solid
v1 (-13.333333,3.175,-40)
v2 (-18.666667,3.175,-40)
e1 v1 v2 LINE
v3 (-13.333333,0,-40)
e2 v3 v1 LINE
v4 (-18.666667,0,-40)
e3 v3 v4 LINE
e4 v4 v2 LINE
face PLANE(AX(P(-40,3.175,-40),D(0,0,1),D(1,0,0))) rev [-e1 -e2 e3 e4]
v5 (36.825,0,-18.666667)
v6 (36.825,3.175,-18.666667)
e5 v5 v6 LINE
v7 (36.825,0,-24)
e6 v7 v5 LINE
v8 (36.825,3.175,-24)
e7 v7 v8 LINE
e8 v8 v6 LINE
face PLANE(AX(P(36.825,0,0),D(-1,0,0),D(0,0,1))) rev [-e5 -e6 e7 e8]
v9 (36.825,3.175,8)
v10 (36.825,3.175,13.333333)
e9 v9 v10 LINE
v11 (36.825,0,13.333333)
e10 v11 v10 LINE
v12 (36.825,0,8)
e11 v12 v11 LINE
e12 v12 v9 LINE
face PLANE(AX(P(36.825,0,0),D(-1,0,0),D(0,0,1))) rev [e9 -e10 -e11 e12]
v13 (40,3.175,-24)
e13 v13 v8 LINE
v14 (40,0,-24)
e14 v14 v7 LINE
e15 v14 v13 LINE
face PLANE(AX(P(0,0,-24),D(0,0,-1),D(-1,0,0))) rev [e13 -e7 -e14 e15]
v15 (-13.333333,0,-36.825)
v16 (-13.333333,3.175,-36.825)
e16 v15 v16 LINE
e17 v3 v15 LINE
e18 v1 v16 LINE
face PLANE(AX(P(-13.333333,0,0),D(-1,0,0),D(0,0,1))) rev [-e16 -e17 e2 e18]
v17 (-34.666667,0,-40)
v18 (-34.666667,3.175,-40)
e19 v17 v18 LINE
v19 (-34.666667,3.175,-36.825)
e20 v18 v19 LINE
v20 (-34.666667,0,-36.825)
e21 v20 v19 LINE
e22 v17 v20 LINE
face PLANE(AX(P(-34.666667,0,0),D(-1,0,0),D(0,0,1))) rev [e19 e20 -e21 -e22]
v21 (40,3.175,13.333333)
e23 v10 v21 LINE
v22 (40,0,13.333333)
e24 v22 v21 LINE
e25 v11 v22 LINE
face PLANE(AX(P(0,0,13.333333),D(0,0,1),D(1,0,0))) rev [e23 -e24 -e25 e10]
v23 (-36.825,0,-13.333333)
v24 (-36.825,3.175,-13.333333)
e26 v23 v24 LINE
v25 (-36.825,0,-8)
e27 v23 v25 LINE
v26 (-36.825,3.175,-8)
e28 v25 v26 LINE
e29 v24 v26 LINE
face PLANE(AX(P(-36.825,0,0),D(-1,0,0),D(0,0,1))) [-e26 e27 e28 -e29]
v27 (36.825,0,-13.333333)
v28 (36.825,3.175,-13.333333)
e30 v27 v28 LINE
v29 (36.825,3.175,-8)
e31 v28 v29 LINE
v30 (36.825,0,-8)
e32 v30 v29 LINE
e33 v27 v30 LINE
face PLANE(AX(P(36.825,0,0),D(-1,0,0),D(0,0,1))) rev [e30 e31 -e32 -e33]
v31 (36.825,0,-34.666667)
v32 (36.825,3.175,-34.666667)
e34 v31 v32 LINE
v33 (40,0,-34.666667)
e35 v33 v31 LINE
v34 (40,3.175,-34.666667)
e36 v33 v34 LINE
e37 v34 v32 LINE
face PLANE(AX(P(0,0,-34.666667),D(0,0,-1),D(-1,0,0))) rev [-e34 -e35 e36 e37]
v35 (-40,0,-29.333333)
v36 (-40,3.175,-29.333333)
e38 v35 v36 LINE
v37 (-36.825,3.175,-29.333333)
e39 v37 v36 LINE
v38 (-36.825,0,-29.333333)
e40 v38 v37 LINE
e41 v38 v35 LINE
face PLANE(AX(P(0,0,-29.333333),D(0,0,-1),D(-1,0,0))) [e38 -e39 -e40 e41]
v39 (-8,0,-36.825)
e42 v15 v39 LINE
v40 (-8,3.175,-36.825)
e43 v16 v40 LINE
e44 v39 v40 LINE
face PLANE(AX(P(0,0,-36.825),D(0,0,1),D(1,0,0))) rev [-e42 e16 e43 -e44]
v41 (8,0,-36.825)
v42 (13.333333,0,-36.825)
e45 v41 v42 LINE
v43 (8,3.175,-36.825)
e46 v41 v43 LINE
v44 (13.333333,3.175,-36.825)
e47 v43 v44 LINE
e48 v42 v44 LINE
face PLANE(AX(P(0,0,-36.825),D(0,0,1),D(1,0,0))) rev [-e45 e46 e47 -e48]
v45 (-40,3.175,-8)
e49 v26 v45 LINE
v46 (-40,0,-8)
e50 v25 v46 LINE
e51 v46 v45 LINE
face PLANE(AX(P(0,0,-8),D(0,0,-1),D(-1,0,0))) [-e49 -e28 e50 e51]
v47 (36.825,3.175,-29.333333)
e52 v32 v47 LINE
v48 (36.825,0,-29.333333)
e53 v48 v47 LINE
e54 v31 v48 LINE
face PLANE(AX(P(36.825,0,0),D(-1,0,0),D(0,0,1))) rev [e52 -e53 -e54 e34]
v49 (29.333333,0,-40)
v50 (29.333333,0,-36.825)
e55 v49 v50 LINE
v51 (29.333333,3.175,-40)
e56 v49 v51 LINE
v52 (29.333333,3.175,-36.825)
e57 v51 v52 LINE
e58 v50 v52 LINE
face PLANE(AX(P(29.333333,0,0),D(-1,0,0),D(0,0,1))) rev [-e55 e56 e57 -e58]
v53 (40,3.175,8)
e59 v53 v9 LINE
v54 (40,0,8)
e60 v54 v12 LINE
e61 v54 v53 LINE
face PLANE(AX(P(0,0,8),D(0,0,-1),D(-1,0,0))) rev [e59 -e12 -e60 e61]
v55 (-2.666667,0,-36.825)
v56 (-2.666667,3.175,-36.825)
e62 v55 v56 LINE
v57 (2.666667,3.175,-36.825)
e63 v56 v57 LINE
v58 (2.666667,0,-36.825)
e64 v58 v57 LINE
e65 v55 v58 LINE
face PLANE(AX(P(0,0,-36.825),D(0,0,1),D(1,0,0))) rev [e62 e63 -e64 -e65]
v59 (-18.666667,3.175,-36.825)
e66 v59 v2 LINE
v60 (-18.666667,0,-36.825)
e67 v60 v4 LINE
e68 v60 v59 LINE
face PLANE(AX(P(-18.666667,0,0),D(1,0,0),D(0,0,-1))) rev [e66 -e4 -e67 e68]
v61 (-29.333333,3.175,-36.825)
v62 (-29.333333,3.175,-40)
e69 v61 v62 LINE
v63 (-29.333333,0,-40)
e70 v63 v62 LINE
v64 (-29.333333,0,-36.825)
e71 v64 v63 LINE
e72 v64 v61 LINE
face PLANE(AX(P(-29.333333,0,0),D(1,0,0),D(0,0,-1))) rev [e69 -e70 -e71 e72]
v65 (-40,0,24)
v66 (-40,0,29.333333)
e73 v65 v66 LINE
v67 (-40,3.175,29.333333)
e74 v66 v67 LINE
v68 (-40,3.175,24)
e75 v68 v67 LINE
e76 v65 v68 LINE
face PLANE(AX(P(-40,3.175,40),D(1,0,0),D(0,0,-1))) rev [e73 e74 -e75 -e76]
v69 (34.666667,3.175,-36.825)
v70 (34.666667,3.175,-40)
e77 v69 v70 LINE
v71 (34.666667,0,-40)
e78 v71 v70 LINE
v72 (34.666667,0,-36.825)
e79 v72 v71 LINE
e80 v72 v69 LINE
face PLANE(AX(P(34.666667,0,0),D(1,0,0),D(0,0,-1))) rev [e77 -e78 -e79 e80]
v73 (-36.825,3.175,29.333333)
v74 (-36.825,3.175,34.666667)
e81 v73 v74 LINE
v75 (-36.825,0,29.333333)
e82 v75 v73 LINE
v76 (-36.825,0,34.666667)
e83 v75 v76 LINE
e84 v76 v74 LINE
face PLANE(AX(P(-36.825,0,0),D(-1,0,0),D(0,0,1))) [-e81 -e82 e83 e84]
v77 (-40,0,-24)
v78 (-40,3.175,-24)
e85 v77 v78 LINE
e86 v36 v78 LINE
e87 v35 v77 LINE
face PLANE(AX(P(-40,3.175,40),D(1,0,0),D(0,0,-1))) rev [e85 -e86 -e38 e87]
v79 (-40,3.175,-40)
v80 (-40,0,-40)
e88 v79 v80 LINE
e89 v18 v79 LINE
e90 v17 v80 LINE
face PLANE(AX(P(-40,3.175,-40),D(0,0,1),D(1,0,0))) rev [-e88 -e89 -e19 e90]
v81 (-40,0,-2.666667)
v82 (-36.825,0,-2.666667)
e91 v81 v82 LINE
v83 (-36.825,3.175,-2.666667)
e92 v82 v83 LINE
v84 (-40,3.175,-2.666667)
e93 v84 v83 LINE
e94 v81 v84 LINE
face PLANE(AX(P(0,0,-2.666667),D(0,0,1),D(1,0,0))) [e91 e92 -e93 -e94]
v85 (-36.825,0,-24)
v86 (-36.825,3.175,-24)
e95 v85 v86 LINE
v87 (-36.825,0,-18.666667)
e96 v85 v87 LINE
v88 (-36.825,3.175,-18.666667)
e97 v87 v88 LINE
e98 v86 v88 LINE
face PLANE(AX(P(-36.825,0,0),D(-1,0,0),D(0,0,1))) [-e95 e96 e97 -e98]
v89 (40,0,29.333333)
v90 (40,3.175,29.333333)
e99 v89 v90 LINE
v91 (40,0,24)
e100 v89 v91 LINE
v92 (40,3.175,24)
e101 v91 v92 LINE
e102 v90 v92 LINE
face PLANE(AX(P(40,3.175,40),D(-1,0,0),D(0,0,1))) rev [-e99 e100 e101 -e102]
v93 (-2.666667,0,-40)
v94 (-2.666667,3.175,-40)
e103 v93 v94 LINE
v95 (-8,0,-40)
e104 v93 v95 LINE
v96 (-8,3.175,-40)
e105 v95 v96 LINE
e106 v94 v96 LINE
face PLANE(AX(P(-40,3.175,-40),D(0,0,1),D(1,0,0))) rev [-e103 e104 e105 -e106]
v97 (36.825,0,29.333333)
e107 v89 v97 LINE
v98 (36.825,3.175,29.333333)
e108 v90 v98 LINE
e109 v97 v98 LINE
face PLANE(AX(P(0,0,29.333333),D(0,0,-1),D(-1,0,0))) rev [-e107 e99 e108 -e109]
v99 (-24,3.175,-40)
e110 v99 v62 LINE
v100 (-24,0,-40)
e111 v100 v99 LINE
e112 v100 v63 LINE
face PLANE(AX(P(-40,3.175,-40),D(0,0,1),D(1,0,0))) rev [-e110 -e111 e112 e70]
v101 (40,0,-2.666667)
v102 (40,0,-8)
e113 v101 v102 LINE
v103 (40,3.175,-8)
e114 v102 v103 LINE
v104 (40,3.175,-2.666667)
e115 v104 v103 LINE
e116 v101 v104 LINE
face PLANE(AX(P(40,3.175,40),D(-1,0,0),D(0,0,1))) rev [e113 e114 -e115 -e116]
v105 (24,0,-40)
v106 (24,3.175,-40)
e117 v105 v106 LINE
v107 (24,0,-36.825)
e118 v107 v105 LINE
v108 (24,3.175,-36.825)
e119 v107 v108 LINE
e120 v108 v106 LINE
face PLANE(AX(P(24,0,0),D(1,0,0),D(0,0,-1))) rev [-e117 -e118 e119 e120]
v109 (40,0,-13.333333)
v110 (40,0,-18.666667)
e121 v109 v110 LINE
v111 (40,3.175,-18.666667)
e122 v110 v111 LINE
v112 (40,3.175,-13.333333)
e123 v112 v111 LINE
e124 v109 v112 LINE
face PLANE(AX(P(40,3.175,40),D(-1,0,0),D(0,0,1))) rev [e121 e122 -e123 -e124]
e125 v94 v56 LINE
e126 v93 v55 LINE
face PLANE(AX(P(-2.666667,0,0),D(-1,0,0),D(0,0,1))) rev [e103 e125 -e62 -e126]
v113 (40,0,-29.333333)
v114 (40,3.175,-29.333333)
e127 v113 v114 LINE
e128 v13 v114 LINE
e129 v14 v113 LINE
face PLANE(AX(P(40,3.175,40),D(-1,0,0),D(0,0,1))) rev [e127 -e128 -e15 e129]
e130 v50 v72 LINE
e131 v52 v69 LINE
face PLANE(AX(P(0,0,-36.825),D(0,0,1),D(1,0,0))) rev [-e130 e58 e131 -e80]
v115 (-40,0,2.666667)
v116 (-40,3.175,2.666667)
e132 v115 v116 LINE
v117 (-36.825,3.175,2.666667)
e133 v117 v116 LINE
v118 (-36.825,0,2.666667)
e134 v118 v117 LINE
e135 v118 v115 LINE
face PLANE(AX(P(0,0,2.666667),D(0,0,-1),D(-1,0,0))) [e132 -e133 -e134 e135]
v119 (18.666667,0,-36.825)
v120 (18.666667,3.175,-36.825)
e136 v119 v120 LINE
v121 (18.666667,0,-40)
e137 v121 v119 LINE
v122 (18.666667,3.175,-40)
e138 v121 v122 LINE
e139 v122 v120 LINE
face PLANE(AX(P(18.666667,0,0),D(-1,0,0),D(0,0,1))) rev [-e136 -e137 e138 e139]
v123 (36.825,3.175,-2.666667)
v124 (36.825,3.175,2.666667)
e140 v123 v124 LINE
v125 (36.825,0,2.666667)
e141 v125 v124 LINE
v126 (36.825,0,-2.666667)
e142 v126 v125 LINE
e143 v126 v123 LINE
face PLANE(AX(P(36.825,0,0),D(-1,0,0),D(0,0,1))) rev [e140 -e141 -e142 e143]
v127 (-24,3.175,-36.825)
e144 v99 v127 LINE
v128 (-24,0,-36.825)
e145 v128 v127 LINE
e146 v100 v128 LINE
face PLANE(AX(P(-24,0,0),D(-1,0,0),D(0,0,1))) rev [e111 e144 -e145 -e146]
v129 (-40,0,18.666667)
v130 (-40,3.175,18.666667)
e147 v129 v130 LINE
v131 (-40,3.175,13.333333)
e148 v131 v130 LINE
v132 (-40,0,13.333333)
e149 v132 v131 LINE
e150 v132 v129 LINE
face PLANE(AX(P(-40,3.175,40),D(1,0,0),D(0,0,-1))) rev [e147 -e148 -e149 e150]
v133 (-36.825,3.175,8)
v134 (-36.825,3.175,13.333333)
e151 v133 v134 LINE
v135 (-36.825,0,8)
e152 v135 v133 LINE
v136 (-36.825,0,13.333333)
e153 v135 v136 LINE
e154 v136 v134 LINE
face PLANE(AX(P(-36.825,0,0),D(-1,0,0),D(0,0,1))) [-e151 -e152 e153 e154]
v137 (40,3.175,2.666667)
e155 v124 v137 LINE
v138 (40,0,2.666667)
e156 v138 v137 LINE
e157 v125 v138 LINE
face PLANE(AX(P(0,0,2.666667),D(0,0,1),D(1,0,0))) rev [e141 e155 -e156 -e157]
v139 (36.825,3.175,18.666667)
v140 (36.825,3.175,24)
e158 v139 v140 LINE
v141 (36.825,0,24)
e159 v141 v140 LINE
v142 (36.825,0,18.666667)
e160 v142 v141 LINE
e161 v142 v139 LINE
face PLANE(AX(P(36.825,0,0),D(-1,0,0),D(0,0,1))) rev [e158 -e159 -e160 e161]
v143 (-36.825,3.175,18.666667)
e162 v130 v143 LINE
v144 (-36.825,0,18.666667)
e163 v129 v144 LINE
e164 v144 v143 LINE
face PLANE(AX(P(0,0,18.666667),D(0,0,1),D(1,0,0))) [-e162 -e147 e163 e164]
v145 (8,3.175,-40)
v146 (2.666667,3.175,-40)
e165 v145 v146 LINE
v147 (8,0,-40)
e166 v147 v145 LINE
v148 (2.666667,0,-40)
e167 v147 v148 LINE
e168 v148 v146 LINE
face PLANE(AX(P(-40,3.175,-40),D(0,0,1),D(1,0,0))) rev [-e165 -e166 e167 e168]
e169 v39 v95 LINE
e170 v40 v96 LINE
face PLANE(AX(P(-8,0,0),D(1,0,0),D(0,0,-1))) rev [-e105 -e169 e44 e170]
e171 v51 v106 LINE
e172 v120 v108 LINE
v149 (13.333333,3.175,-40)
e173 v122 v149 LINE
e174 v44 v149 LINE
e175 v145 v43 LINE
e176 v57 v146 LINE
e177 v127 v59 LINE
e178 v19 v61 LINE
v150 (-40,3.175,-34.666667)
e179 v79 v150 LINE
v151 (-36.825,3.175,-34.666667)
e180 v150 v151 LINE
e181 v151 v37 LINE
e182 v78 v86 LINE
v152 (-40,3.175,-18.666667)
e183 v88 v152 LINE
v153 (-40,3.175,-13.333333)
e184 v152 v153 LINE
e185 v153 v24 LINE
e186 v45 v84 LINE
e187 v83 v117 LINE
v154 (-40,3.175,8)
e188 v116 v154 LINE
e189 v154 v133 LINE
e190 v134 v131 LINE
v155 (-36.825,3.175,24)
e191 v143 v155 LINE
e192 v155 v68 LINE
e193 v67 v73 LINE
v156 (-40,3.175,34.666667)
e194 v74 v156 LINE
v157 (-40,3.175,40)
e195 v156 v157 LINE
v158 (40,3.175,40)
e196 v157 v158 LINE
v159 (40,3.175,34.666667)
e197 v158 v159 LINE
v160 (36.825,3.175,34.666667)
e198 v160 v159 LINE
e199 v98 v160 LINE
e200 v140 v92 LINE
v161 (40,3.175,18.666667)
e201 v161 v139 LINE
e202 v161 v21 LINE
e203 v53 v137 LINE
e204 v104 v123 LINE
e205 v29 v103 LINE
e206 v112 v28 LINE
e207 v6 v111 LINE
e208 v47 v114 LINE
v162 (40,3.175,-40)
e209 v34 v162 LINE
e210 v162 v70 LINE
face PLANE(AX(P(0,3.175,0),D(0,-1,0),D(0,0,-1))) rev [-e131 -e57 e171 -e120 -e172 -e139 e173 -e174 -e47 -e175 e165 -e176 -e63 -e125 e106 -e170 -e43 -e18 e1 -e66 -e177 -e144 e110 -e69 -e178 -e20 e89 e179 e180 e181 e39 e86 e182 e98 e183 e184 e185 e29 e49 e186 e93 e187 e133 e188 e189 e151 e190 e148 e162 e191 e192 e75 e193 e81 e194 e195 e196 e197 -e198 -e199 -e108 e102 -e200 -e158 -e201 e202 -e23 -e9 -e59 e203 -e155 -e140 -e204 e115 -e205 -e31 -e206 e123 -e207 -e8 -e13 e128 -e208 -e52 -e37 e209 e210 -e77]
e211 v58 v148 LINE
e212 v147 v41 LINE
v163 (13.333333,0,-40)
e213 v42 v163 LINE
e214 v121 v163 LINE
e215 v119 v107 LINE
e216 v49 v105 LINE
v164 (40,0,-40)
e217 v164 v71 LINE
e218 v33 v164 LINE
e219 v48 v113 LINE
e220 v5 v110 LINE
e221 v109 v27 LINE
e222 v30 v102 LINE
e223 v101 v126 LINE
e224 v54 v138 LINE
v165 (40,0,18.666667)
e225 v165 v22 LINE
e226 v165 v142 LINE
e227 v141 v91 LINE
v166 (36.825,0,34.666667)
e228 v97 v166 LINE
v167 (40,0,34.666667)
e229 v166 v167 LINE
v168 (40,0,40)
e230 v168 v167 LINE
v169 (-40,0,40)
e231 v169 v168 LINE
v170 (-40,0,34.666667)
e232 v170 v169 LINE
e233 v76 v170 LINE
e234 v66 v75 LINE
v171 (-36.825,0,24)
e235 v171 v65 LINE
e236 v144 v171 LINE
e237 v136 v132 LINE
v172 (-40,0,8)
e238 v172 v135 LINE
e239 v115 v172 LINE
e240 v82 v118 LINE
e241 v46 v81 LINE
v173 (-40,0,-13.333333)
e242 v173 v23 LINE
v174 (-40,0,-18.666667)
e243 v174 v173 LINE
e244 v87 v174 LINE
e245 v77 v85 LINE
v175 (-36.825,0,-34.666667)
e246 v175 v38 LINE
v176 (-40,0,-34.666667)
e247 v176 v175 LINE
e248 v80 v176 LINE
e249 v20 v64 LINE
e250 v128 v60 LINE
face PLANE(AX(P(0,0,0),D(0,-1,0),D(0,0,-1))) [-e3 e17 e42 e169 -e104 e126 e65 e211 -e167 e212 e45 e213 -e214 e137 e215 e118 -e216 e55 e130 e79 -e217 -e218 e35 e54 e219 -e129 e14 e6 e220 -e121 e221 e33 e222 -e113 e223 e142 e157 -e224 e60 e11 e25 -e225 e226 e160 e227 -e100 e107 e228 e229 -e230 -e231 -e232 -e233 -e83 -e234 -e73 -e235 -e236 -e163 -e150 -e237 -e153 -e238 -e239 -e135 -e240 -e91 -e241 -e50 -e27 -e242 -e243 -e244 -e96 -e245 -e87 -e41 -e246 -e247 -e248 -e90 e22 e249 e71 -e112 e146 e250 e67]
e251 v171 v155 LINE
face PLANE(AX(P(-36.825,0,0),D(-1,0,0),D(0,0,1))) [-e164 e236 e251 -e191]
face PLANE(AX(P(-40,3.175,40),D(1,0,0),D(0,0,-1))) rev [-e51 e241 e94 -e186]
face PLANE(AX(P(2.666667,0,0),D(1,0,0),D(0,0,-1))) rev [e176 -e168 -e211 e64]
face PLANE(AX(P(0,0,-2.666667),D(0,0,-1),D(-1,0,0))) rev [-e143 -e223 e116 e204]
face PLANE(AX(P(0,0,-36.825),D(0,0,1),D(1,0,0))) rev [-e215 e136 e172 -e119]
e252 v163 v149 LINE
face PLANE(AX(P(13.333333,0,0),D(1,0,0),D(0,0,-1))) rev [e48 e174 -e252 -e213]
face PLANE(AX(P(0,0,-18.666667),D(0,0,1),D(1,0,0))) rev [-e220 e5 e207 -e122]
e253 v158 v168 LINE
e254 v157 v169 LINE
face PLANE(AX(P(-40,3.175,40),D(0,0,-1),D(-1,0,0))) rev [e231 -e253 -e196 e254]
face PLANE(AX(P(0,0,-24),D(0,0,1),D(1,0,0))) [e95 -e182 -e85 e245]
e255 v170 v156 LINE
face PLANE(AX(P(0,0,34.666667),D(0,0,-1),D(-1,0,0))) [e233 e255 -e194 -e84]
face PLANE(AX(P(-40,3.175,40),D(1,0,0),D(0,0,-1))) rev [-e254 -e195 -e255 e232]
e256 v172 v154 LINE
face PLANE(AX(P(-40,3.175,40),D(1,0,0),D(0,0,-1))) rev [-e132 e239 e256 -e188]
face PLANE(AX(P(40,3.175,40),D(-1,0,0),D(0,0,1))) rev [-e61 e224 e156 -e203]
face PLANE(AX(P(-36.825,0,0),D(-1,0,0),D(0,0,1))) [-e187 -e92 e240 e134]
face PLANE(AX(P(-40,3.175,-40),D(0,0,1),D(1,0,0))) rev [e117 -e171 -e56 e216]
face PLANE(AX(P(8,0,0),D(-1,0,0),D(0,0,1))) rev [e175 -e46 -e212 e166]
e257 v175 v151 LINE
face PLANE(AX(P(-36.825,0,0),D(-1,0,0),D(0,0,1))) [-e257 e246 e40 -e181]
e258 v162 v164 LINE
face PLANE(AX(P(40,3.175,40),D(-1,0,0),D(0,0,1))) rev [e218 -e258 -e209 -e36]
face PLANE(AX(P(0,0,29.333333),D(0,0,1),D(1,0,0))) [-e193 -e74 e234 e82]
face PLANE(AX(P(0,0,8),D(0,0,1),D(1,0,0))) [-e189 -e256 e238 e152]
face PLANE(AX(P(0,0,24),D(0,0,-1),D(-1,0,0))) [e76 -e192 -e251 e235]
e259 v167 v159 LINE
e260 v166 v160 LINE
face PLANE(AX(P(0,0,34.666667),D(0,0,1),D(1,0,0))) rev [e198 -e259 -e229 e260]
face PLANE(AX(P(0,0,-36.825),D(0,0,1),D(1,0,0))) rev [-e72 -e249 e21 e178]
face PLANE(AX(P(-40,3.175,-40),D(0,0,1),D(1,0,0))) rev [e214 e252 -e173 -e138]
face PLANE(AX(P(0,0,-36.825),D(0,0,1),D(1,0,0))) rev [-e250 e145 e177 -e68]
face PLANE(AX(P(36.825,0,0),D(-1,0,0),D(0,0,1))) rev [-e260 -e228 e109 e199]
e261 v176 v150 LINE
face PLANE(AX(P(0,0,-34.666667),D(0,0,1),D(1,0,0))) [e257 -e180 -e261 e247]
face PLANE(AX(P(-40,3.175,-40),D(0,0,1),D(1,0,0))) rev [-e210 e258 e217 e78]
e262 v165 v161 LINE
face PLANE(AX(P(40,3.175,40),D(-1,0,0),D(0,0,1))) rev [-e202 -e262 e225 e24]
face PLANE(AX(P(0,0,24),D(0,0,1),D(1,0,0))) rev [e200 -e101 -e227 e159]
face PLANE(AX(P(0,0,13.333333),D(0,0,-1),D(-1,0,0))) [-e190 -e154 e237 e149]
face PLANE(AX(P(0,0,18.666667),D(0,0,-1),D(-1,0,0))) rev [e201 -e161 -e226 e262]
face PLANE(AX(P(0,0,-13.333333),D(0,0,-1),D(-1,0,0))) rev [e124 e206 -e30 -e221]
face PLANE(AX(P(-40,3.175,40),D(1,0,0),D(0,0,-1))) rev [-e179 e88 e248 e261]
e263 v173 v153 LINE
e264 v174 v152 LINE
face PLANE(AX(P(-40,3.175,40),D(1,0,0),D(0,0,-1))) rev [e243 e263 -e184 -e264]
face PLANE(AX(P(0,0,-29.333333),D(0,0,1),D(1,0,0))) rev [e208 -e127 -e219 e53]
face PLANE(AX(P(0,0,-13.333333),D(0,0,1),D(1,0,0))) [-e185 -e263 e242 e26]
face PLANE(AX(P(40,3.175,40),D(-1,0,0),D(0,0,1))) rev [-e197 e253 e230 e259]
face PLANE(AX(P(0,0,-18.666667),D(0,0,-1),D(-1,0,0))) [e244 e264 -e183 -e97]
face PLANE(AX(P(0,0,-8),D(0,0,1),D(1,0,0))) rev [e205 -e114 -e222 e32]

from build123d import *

# Parameters (mm, degrees)
SKETCH1_W                = 80
SKETCH1_H                = 80
BOSS_EXTRUDE1_DEPTH      = 3.175
CUT_EXTRUDE3_START       = -3.175
CUT_EXTRUDE3_OUTLINE_W   = 3.175
CUT_EXTRUDE3_OUTLINE_H   = 5.333333334
CUT_EXTRUDE3_OUTLINE_H_2 = 5.333333333
CUT_EXTRUDE3_OUTLINE_W_2 = 5.333333334
CUT_EXTRUDE3_OUTLINE_H_3 = 3.175
CUT_EXTRUDE3_OUTLINE_W_3 = 5.333333333
CUT_EXTRUDE3_DEPTH       = 3.175
SKETCH3_W                = 80
SKETCH3_H                = 5.333333333
BOSS_EXTRUDE2_DEPTH      = 3.175


# Read off the part's stored shape, not the designer's step: Cut-Extrude3
with BuildPart() as part:
    # Sketch1 → Boss-Extrude1 (new body)
    with BuildSketch(Plane(origin=(0, 0, 0), x_dir=(1, 0, 0), z_dir=(0, 1, 0))):
        Rectangle(SKETCH1_W, SKETCH1_H)
    extrude(amount=BOSS_EXTRUDE1_DEPTH)

    # Cut-Extrude3 outline → Cut-Extrude3 (cut)
    with BuildSketch(Plane(origin=(0, 3.175, 0), x_dir=(1, 0, 0), z_dir=(0, 1, 0)).offset(CUT_EXTRUDE3_START)):
        with Locations((-38.4125, 32)):
            Rectangle(CUT_EXTRUDE3_OUTLINE_W, CUT_EXTRUDE3_OUTLINE_H)
        with Locations((-38.4125, 21.333333334)):
            Rectangle(CUT_EXTRUDE3_OUTLINE_W, CUT_EXTRUDE3_OUTLINE_H_2)
        with Locations((-32, 38.4125)):
            Rectangle(CUT_EXTRUDE3_OUTLINE_W_2, CUT_EXTRUDE3_OUTLINE_H_3)
        with Locations((-38.4125, 10.666666666)):
            Rectangle(CUT_EXTRUDE3_OUTLINE_W, CUT_EXTRUDE3_OUTLINE_H_2)
        with Locations((-21.333333334, 38.4125)):
            Rectangle(CUT_EXTRUDE3_OUTLINE_W_3, CUT_EXTRUDE3_OUTLINE_H_3)
        with Locations((-38.4125, 0)):
            Rectangle(CUT_EXTRUDE3_OUTLINE_W, CUT_EXTRUDE3_OUTLINE_H)
        with Locations((-10.666666666, 38.4125)):
            Rectangle(CUT_EXTRUDE3_OUTLINE_W_3, CUT_EXTRUDE3_OUTLINE_H_3)
        with Locations((-38.4125, -10.666666666)):
            Rectangle(CUT_EXTRUDE3_OUTLINE_W, CUT_EXTRUDE3_OUTLINE_H_2)
        with Locations((0, 38.4125)):
            Rectangle(CUT_EXTRUDE3_OUTLINE_W_2, CUT_EXTRUDE3_OUTLINE_H_3)
        with Locations((-38.4125, -21.333333334)):
            Rectangle(CUT_EXTRUDE3_OUTLINE_W, CUT_EXTRUDE3_OUTLINE_H_2)
        with Locations((10.666666666, 38.4125)):
            Rectangle(CUT_EXTRUDE3_OUTLINE_W_3, CUT_EXTRUDE3_OUTLINE_H_3)
        with Locations((-38.4125, -32)):
            Rectangle(CUT_EXTRUDE3_OUTLINE_W, CUT_EXTRUDE3_OUTLINE_H)
        with Locations((21.333333334, 38.4125)):
            Rectangle(CUT_EXTRUDE3_OUTLINE_W_3, CUT_EXTRUDE3_OUTLINE_H_3)
        with Locations((32, 38.4125)):
            Rectangle(CUT_EXTRUDE3_OUTLINE_W_2, CUT_EXTRUDE3_OUTLINE_H_3)
        with Locations((-32, -38.4125)):
            Rectangle(CUT_EXTRUDE3_OUTLINE_W_2, CUT_EXTRUDE3_OUTLINE_H_3)
        with Locations((-21.333333334, -38.4125)):
            Rectangle(CUT_EXTRUDE3_OUTLINE_W_3, CUT_EXTRUDE3_OUTLINE_H_3)
        with Locations((38.4125, 32)):
            Rectangle(CUT_EXTRUDE3_OUTLINE_W, CUT_EXTRUDE3_OUTLINE_H)
        with Locations((-10.666666666, -38.4125)):
            Rectangle(CUT_EXTRUDE3_OUTLINE_W_3, CUT_EXTRUDE3_OUTLINE_H_3)
        with Locations((38.4125, 21.333333334)):
            Rectangle(CUT_EXTRUDE3_OUTLINE_W, CUT_EXTRUDE3_OUTLINE_H_2)
        with Locations((0, -38.4125)):
            Rectangle(CUT_EXTRUDE3_OUTLINE_W_2, CUT_EXTRUDE3_OUTLINE_H_3)
        with Locations((38.4125, 10.666666666)):
            Rectangle(CUT_EXTRUDE3_OUTLINE_W, CUT_EXTRUDE3_OUTLINE_H_2)
        with Locations((10.666666666, -38.4125)):
            Rectangle(CUT_EXTRUDE3_OUTLINE_W_3, CUT_EXTRUDE3_OUTLINE_H_3)
        with Locations((38.4125, 0)):
            Rectangle(CUT_EXTRUDE3_OUTLINE_W, CUT_EXTRUDE3_OUTLINE_H)
        with Locations((21.333333334, -38.4125)):
            Rectangle(CUT_EXTRUDE3_OUTLINE_W_3, CUT_EXTRUDE3_OUTLINE_H_3)
        with Locations((38.4125, -10.666666666)):
            Rectangle(CUT_EXTRUDE3_OUTLINE_W, CUT_EXTRUDE3_OUTLINE_H_2)
        with Locations((32, -38.4125)):
            Rectangle(CUT_EXTRUDE3_OUTLINE_W_2, CUT_EXTRUDE3_OUTLINE_H_3)
        with Locations((38.4125, -21.333333334)):
            Rectangle(CUT_EXTRUDE3_OUTLINE_W, CUT_EXTRUDE3_OUTLINE_H_2)
        with Locations((38.4125, -32)):
            Rectangle(CUT_EXTRUDE3_OUTLINE_W, CUT_EXTRUDE3_OUTLINE_H)
    extrude(amount=CUT_EXTRUDE3_DEPTH, mode=Mode.SUBTRACT)

    # Sketch3 → Boss-Extrude2 (add)
    with BuildSketch(Plane.XZ):
        with Locations((0, 37.333333334)):
            Rectangle(SKETCH3_W, SKETCH3_H)
    extrude(amount=-BOSS_EXTRUDE2_DEPTH)


solid = part.part
